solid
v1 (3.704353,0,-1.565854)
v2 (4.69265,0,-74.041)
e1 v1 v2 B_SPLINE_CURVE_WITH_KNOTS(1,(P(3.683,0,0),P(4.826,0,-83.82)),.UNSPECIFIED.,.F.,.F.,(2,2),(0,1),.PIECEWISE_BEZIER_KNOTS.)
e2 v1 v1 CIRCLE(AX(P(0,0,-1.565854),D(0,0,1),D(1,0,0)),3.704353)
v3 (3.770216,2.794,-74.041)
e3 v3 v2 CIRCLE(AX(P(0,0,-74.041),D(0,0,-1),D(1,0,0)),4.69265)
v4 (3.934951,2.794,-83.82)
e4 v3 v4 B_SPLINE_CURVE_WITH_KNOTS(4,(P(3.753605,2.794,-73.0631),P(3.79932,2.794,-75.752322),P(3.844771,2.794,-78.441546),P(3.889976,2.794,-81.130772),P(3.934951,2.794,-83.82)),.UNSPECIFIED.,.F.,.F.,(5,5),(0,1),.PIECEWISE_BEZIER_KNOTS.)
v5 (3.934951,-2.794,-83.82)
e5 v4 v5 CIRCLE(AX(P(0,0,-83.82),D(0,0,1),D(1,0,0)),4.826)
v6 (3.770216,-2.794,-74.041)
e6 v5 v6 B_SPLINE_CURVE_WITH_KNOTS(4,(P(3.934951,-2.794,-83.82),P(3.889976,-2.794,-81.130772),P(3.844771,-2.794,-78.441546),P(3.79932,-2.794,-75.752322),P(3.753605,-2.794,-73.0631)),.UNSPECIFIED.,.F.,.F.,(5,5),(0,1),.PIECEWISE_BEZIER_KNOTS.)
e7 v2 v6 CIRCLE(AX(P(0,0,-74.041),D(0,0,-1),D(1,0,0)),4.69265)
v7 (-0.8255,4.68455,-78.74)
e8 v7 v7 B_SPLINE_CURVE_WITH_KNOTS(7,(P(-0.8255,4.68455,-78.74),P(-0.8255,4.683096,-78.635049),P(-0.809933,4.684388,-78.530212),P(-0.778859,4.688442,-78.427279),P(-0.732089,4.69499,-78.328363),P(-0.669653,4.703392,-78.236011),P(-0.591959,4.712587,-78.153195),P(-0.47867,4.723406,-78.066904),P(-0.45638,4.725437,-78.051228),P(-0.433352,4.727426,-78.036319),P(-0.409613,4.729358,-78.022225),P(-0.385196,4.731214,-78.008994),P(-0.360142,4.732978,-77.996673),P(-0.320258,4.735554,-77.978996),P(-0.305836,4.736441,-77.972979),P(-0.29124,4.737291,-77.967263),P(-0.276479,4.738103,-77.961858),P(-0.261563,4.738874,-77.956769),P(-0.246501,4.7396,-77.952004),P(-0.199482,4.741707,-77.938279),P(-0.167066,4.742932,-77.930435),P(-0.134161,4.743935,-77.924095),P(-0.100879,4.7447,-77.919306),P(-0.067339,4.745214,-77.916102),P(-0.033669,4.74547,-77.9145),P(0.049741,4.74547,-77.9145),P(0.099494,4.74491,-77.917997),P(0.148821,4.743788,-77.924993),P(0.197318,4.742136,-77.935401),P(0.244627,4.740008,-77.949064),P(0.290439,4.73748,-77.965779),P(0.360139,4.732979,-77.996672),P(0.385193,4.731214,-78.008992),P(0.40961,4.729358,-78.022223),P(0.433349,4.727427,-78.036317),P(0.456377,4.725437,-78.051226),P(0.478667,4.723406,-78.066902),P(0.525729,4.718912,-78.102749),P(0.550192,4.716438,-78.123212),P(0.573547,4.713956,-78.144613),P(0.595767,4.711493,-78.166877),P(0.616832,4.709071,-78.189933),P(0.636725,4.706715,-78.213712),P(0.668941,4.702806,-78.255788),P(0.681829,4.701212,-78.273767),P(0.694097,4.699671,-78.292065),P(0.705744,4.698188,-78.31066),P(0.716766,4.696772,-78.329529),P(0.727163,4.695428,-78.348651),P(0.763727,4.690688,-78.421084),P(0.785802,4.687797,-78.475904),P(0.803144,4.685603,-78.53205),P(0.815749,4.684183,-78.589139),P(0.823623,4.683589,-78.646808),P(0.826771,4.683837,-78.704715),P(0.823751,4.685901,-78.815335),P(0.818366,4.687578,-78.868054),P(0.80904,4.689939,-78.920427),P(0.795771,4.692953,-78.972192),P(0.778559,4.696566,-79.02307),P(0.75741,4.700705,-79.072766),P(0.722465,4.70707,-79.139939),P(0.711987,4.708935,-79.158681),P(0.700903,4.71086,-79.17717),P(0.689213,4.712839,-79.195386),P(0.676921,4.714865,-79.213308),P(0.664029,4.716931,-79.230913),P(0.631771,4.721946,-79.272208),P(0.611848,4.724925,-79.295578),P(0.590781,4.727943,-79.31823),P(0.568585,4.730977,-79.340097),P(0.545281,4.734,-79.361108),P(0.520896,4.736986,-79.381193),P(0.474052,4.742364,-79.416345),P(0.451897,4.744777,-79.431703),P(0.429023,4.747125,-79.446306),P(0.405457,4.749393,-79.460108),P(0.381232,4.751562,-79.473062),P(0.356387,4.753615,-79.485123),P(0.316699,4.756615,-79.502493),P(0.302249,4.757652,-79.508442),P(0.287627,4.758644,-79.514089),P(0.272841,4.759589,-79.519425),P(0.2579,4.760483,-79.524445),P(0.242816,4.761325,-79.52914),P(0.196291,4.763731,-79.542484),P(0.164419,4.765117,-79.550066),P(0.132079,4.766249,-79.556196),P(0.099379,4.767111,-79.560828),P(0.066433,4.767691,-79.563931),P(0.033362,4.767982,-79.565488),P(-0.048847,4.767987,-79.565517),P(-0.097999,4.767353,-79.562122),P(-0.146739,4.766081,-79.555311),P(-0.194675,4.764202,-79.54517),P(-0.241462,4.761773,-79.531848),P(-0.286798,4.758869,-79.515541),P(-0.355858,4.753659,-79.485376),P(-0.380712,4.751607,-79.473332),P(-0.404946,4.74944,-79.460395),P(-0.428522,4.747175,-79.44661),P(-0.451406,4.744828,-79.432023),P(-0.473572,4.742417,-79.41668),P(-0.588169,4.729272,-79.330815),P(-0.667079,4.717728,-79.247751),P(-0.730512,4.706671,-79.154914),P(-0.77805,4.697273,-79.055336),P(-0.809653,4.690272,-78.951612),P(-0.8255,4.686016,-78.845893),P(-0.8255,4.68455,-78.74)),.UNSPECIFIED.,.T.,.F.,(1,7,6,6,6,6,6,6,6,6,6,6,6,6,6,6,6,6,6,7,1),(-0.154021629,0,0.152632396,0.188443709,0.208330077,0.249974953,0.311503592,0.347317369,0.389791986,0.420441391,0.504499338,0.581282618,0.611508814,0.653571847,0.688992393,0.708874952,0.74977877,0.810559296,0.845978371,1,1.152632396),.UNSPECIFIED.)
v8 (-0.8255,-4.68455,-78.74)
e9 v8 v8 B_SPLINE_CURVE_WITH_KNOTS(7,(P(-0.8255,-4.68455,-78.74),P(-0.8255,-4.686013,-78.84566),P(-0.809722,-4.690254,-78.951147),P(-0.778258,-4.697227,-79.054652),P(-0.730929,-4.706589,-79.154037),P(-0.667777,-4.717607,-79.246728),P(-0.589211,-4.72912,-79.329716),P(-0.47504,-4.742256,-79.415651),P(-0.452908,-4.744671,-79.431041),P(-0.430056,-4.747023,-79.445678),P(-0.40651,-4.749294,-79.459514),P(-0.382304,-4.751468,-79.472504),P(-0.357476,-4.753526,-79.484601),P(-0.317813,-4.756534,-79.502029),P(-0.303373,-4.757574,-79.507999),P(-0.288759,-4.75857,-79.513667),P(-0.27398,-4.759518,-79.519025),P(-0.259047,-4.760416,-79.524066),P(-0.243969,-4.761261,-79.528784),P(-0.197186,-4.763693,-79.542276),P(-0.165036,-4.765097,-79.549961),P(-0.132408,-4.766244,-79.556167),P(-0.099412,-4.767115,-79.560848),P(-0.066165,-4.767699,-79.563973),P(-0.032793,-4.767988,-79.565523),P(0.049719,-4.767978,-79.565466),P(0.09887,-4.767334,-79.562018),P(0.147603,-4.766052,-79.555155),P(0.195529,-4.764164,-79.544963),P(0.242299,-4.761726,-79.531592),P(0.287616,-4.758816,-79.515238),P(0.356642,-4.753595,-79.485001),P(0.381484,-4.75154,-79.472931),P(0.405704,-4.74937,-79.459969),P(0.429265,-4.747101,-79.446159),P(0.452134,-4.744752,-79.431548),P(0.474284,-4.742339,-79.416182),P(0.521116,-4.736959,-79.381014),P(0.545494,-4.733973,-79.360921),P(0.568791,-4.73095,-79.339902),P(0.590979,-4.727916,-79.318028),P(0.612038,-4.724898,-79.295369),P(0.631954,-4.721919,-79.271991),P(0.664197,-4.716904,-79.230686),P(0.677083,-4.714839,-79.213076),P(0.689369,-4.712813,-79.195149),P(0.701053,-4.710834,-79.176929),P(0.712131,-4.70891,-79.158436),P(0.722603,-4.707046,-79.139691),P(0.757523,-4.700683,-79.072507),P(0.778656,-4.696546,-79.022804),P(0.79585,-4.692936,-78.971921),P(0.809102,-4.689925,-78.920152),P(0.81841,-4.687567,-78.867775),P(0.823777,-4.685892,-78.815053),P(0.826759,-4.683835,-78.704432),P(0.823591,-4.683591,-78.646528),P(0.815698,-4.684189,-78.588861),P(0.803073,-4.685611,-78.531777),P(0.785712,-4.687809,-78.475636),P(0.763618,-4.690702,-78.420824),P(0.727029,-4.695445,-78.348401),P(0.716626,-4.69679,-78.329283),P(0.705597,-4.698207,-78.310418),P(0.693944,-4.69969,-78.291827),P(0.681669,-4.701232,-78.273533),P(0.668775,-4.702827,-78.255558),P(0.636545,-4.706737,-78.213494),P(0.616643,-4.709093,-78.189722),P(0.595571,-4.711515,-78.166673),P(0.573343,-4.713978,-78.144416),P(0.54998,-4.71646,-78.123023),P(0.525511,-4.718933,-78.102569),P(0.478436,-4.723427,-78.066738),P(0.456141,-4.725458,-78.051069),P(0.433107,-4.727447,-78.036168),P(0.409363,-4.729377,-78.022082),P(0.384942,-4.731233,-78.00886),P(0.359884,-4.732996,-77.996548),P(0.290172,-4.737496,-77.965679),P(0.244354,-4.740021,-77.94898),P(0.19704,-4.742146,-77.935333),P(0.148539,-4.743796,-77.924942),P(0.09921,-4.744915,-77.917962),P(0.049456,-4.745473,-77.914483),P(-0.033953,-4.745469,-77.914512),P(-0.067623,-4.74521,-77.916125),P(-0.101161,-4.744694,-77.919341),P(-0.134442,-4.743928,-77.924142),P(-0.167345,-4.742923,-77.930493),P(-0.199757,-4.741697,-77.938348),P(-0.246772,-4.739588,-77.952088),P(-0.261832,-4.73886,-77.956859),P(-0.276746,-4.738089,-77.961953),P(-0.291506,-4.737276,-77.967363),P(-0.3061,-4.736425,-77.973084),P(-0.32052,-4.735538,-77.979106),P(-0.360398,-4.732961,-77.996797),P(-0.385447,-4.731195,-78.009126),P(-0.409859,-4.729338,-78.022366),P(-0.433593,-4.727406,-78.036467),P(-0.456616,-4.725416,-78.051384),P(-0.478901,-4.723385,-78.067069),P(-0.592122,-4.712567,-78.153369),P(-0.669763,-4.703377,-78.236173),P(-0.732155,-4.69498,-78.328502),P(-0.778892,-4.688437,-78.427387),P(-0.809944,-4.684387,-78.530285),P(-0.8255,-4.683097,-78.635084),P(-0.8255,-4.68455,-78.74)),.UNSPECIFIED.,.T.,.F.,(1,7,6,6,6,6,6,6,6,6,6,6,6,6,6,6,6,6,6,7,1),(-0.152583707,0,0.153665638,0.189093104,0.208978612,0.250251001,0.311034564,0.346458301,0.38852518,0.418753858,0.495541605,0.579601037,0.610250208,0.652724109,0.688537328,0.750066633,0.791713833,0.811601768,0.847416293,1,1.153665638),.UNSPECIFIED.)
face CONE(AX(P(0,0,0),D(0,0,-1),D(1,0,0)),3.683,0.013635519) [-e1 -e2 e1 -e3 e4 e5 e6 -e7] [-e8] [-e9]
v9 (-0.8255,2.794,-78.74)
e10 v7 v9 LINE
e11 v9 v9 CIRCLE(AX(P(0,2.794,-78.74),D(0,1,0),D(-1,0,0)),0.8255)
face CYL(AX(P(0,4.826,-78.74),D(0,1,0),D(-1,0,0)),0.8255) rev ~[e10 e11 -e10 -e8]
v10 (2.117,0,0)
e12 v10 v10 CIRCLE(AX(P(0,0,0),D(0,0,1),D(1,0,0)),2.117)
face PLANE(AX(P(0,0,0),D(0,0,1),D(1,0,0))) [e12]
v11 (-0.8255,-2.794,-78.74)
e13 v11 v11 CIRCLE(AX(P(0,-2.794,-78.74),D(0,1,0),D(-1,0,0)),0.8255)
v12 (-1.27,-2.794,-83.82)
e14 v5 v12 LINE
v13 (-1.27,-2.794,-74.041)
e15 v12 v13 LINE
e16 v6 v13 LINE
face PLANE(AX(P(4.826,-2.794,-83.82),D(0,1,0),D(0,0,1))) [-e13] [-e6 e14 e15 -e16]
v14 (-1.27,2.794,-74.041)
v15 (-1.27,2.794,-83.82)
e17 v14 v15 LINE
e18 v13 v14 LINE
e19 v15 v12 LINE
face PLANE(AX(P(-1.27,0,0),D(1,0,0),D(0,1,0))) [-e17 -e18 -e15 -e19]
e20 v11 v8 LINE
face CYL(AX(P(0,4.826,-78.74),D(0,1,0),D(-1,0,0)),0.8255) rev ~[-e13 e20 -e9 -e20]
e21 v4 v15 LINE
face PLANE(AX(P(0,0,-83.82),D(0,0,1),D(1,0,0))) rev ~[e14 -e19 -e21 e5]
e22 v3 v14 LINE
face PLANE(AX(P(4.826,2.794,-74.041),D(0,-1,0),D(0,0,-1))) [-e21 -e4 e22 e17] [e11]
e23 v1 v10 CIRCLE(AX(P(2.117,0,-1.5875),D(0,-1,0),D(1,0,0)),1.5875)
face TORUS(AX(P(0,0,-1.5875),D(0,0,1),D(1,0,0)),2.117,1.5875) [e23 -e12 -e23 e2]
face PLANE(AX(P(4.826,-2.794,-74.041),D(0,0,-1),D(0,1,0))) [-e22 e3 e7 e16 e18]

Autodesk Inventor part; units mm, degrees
sketch "Sketch1" plane through (0, 0, 0) normal (0, 0, 1) x (1, 0, 0)
  point P0 (0, 0)
sketch "Sketch2" plane through (0, 0, 0) normal (0, 0, 1) x (1, 0, 0)
  circle A0 centre (0, 0) radius 3.683
  dimension "d0" = 7.366
ref_plane "Work Plane1" through (0, 0, -83.82) normal (0, 0, 1) x (1, 0, 0)
sketch "Sketch3" plane through (0, 0, -83.82) normal (0, 0, 1) x (1, 0, 0)
  circle A0 centre (0, 0) radius 4.826
  dimension "d2" = 9.652
loft "Loft1" add profiles "Sketch2", "Sketch3"
fillet "Fillet1" radius 1.5875 1 edges at (-3.683, 0, 0)
ref_plane "Work Plane2" through (0, 4.826, 0) normal (0, 1, 0) x (-1, 0, 0)
sketch "Sketch4" plane through (0, 4.826, 0) normal (0, 1, 0) x (-1, 0, 0)
  circle A0 centre (0, -78.74) radius 0.8255
  line L0 (4.826, -83.82) -> (-4.826, -83.82) projected
  point P0 (0, 0)
  dimension "d9" = 1.651
  dimension "d10" = 5.08
extrude "Extrusion1" cut sketch "Sketch4" against normal up to next
ref_plane "Work Plane3" through (4.826, 0, 0) normal (1, 0, 0) x (0, 1, 0)
sketch "Sketch8" plane through (4.826, 0, 0) normal (1, 0, 0) x (0, 1, 0)
  line L0 (4.826, -83.82) -> (-4.826, -83.82) projected
  line L1 (-2.794, -74.041) -> (2.794, -74.041)
  line L2 (2.794, -74.041) -> (2.794, -83.82)
  line L3 (2.794, -83.82) -> (-2.794, -83.82)
  line L4 (-2.794, -83.82) -> (-2.794, -74.041)
  point P0 (0, 0)
  dimension "d14" = 2.794
  dimension "d15" = 5.588
  dimension "d16" = 9.779
extrude "Extrusion2" cut sketch "Sketch8" against normal blind 6.096
properties part number "AntennaMast"
